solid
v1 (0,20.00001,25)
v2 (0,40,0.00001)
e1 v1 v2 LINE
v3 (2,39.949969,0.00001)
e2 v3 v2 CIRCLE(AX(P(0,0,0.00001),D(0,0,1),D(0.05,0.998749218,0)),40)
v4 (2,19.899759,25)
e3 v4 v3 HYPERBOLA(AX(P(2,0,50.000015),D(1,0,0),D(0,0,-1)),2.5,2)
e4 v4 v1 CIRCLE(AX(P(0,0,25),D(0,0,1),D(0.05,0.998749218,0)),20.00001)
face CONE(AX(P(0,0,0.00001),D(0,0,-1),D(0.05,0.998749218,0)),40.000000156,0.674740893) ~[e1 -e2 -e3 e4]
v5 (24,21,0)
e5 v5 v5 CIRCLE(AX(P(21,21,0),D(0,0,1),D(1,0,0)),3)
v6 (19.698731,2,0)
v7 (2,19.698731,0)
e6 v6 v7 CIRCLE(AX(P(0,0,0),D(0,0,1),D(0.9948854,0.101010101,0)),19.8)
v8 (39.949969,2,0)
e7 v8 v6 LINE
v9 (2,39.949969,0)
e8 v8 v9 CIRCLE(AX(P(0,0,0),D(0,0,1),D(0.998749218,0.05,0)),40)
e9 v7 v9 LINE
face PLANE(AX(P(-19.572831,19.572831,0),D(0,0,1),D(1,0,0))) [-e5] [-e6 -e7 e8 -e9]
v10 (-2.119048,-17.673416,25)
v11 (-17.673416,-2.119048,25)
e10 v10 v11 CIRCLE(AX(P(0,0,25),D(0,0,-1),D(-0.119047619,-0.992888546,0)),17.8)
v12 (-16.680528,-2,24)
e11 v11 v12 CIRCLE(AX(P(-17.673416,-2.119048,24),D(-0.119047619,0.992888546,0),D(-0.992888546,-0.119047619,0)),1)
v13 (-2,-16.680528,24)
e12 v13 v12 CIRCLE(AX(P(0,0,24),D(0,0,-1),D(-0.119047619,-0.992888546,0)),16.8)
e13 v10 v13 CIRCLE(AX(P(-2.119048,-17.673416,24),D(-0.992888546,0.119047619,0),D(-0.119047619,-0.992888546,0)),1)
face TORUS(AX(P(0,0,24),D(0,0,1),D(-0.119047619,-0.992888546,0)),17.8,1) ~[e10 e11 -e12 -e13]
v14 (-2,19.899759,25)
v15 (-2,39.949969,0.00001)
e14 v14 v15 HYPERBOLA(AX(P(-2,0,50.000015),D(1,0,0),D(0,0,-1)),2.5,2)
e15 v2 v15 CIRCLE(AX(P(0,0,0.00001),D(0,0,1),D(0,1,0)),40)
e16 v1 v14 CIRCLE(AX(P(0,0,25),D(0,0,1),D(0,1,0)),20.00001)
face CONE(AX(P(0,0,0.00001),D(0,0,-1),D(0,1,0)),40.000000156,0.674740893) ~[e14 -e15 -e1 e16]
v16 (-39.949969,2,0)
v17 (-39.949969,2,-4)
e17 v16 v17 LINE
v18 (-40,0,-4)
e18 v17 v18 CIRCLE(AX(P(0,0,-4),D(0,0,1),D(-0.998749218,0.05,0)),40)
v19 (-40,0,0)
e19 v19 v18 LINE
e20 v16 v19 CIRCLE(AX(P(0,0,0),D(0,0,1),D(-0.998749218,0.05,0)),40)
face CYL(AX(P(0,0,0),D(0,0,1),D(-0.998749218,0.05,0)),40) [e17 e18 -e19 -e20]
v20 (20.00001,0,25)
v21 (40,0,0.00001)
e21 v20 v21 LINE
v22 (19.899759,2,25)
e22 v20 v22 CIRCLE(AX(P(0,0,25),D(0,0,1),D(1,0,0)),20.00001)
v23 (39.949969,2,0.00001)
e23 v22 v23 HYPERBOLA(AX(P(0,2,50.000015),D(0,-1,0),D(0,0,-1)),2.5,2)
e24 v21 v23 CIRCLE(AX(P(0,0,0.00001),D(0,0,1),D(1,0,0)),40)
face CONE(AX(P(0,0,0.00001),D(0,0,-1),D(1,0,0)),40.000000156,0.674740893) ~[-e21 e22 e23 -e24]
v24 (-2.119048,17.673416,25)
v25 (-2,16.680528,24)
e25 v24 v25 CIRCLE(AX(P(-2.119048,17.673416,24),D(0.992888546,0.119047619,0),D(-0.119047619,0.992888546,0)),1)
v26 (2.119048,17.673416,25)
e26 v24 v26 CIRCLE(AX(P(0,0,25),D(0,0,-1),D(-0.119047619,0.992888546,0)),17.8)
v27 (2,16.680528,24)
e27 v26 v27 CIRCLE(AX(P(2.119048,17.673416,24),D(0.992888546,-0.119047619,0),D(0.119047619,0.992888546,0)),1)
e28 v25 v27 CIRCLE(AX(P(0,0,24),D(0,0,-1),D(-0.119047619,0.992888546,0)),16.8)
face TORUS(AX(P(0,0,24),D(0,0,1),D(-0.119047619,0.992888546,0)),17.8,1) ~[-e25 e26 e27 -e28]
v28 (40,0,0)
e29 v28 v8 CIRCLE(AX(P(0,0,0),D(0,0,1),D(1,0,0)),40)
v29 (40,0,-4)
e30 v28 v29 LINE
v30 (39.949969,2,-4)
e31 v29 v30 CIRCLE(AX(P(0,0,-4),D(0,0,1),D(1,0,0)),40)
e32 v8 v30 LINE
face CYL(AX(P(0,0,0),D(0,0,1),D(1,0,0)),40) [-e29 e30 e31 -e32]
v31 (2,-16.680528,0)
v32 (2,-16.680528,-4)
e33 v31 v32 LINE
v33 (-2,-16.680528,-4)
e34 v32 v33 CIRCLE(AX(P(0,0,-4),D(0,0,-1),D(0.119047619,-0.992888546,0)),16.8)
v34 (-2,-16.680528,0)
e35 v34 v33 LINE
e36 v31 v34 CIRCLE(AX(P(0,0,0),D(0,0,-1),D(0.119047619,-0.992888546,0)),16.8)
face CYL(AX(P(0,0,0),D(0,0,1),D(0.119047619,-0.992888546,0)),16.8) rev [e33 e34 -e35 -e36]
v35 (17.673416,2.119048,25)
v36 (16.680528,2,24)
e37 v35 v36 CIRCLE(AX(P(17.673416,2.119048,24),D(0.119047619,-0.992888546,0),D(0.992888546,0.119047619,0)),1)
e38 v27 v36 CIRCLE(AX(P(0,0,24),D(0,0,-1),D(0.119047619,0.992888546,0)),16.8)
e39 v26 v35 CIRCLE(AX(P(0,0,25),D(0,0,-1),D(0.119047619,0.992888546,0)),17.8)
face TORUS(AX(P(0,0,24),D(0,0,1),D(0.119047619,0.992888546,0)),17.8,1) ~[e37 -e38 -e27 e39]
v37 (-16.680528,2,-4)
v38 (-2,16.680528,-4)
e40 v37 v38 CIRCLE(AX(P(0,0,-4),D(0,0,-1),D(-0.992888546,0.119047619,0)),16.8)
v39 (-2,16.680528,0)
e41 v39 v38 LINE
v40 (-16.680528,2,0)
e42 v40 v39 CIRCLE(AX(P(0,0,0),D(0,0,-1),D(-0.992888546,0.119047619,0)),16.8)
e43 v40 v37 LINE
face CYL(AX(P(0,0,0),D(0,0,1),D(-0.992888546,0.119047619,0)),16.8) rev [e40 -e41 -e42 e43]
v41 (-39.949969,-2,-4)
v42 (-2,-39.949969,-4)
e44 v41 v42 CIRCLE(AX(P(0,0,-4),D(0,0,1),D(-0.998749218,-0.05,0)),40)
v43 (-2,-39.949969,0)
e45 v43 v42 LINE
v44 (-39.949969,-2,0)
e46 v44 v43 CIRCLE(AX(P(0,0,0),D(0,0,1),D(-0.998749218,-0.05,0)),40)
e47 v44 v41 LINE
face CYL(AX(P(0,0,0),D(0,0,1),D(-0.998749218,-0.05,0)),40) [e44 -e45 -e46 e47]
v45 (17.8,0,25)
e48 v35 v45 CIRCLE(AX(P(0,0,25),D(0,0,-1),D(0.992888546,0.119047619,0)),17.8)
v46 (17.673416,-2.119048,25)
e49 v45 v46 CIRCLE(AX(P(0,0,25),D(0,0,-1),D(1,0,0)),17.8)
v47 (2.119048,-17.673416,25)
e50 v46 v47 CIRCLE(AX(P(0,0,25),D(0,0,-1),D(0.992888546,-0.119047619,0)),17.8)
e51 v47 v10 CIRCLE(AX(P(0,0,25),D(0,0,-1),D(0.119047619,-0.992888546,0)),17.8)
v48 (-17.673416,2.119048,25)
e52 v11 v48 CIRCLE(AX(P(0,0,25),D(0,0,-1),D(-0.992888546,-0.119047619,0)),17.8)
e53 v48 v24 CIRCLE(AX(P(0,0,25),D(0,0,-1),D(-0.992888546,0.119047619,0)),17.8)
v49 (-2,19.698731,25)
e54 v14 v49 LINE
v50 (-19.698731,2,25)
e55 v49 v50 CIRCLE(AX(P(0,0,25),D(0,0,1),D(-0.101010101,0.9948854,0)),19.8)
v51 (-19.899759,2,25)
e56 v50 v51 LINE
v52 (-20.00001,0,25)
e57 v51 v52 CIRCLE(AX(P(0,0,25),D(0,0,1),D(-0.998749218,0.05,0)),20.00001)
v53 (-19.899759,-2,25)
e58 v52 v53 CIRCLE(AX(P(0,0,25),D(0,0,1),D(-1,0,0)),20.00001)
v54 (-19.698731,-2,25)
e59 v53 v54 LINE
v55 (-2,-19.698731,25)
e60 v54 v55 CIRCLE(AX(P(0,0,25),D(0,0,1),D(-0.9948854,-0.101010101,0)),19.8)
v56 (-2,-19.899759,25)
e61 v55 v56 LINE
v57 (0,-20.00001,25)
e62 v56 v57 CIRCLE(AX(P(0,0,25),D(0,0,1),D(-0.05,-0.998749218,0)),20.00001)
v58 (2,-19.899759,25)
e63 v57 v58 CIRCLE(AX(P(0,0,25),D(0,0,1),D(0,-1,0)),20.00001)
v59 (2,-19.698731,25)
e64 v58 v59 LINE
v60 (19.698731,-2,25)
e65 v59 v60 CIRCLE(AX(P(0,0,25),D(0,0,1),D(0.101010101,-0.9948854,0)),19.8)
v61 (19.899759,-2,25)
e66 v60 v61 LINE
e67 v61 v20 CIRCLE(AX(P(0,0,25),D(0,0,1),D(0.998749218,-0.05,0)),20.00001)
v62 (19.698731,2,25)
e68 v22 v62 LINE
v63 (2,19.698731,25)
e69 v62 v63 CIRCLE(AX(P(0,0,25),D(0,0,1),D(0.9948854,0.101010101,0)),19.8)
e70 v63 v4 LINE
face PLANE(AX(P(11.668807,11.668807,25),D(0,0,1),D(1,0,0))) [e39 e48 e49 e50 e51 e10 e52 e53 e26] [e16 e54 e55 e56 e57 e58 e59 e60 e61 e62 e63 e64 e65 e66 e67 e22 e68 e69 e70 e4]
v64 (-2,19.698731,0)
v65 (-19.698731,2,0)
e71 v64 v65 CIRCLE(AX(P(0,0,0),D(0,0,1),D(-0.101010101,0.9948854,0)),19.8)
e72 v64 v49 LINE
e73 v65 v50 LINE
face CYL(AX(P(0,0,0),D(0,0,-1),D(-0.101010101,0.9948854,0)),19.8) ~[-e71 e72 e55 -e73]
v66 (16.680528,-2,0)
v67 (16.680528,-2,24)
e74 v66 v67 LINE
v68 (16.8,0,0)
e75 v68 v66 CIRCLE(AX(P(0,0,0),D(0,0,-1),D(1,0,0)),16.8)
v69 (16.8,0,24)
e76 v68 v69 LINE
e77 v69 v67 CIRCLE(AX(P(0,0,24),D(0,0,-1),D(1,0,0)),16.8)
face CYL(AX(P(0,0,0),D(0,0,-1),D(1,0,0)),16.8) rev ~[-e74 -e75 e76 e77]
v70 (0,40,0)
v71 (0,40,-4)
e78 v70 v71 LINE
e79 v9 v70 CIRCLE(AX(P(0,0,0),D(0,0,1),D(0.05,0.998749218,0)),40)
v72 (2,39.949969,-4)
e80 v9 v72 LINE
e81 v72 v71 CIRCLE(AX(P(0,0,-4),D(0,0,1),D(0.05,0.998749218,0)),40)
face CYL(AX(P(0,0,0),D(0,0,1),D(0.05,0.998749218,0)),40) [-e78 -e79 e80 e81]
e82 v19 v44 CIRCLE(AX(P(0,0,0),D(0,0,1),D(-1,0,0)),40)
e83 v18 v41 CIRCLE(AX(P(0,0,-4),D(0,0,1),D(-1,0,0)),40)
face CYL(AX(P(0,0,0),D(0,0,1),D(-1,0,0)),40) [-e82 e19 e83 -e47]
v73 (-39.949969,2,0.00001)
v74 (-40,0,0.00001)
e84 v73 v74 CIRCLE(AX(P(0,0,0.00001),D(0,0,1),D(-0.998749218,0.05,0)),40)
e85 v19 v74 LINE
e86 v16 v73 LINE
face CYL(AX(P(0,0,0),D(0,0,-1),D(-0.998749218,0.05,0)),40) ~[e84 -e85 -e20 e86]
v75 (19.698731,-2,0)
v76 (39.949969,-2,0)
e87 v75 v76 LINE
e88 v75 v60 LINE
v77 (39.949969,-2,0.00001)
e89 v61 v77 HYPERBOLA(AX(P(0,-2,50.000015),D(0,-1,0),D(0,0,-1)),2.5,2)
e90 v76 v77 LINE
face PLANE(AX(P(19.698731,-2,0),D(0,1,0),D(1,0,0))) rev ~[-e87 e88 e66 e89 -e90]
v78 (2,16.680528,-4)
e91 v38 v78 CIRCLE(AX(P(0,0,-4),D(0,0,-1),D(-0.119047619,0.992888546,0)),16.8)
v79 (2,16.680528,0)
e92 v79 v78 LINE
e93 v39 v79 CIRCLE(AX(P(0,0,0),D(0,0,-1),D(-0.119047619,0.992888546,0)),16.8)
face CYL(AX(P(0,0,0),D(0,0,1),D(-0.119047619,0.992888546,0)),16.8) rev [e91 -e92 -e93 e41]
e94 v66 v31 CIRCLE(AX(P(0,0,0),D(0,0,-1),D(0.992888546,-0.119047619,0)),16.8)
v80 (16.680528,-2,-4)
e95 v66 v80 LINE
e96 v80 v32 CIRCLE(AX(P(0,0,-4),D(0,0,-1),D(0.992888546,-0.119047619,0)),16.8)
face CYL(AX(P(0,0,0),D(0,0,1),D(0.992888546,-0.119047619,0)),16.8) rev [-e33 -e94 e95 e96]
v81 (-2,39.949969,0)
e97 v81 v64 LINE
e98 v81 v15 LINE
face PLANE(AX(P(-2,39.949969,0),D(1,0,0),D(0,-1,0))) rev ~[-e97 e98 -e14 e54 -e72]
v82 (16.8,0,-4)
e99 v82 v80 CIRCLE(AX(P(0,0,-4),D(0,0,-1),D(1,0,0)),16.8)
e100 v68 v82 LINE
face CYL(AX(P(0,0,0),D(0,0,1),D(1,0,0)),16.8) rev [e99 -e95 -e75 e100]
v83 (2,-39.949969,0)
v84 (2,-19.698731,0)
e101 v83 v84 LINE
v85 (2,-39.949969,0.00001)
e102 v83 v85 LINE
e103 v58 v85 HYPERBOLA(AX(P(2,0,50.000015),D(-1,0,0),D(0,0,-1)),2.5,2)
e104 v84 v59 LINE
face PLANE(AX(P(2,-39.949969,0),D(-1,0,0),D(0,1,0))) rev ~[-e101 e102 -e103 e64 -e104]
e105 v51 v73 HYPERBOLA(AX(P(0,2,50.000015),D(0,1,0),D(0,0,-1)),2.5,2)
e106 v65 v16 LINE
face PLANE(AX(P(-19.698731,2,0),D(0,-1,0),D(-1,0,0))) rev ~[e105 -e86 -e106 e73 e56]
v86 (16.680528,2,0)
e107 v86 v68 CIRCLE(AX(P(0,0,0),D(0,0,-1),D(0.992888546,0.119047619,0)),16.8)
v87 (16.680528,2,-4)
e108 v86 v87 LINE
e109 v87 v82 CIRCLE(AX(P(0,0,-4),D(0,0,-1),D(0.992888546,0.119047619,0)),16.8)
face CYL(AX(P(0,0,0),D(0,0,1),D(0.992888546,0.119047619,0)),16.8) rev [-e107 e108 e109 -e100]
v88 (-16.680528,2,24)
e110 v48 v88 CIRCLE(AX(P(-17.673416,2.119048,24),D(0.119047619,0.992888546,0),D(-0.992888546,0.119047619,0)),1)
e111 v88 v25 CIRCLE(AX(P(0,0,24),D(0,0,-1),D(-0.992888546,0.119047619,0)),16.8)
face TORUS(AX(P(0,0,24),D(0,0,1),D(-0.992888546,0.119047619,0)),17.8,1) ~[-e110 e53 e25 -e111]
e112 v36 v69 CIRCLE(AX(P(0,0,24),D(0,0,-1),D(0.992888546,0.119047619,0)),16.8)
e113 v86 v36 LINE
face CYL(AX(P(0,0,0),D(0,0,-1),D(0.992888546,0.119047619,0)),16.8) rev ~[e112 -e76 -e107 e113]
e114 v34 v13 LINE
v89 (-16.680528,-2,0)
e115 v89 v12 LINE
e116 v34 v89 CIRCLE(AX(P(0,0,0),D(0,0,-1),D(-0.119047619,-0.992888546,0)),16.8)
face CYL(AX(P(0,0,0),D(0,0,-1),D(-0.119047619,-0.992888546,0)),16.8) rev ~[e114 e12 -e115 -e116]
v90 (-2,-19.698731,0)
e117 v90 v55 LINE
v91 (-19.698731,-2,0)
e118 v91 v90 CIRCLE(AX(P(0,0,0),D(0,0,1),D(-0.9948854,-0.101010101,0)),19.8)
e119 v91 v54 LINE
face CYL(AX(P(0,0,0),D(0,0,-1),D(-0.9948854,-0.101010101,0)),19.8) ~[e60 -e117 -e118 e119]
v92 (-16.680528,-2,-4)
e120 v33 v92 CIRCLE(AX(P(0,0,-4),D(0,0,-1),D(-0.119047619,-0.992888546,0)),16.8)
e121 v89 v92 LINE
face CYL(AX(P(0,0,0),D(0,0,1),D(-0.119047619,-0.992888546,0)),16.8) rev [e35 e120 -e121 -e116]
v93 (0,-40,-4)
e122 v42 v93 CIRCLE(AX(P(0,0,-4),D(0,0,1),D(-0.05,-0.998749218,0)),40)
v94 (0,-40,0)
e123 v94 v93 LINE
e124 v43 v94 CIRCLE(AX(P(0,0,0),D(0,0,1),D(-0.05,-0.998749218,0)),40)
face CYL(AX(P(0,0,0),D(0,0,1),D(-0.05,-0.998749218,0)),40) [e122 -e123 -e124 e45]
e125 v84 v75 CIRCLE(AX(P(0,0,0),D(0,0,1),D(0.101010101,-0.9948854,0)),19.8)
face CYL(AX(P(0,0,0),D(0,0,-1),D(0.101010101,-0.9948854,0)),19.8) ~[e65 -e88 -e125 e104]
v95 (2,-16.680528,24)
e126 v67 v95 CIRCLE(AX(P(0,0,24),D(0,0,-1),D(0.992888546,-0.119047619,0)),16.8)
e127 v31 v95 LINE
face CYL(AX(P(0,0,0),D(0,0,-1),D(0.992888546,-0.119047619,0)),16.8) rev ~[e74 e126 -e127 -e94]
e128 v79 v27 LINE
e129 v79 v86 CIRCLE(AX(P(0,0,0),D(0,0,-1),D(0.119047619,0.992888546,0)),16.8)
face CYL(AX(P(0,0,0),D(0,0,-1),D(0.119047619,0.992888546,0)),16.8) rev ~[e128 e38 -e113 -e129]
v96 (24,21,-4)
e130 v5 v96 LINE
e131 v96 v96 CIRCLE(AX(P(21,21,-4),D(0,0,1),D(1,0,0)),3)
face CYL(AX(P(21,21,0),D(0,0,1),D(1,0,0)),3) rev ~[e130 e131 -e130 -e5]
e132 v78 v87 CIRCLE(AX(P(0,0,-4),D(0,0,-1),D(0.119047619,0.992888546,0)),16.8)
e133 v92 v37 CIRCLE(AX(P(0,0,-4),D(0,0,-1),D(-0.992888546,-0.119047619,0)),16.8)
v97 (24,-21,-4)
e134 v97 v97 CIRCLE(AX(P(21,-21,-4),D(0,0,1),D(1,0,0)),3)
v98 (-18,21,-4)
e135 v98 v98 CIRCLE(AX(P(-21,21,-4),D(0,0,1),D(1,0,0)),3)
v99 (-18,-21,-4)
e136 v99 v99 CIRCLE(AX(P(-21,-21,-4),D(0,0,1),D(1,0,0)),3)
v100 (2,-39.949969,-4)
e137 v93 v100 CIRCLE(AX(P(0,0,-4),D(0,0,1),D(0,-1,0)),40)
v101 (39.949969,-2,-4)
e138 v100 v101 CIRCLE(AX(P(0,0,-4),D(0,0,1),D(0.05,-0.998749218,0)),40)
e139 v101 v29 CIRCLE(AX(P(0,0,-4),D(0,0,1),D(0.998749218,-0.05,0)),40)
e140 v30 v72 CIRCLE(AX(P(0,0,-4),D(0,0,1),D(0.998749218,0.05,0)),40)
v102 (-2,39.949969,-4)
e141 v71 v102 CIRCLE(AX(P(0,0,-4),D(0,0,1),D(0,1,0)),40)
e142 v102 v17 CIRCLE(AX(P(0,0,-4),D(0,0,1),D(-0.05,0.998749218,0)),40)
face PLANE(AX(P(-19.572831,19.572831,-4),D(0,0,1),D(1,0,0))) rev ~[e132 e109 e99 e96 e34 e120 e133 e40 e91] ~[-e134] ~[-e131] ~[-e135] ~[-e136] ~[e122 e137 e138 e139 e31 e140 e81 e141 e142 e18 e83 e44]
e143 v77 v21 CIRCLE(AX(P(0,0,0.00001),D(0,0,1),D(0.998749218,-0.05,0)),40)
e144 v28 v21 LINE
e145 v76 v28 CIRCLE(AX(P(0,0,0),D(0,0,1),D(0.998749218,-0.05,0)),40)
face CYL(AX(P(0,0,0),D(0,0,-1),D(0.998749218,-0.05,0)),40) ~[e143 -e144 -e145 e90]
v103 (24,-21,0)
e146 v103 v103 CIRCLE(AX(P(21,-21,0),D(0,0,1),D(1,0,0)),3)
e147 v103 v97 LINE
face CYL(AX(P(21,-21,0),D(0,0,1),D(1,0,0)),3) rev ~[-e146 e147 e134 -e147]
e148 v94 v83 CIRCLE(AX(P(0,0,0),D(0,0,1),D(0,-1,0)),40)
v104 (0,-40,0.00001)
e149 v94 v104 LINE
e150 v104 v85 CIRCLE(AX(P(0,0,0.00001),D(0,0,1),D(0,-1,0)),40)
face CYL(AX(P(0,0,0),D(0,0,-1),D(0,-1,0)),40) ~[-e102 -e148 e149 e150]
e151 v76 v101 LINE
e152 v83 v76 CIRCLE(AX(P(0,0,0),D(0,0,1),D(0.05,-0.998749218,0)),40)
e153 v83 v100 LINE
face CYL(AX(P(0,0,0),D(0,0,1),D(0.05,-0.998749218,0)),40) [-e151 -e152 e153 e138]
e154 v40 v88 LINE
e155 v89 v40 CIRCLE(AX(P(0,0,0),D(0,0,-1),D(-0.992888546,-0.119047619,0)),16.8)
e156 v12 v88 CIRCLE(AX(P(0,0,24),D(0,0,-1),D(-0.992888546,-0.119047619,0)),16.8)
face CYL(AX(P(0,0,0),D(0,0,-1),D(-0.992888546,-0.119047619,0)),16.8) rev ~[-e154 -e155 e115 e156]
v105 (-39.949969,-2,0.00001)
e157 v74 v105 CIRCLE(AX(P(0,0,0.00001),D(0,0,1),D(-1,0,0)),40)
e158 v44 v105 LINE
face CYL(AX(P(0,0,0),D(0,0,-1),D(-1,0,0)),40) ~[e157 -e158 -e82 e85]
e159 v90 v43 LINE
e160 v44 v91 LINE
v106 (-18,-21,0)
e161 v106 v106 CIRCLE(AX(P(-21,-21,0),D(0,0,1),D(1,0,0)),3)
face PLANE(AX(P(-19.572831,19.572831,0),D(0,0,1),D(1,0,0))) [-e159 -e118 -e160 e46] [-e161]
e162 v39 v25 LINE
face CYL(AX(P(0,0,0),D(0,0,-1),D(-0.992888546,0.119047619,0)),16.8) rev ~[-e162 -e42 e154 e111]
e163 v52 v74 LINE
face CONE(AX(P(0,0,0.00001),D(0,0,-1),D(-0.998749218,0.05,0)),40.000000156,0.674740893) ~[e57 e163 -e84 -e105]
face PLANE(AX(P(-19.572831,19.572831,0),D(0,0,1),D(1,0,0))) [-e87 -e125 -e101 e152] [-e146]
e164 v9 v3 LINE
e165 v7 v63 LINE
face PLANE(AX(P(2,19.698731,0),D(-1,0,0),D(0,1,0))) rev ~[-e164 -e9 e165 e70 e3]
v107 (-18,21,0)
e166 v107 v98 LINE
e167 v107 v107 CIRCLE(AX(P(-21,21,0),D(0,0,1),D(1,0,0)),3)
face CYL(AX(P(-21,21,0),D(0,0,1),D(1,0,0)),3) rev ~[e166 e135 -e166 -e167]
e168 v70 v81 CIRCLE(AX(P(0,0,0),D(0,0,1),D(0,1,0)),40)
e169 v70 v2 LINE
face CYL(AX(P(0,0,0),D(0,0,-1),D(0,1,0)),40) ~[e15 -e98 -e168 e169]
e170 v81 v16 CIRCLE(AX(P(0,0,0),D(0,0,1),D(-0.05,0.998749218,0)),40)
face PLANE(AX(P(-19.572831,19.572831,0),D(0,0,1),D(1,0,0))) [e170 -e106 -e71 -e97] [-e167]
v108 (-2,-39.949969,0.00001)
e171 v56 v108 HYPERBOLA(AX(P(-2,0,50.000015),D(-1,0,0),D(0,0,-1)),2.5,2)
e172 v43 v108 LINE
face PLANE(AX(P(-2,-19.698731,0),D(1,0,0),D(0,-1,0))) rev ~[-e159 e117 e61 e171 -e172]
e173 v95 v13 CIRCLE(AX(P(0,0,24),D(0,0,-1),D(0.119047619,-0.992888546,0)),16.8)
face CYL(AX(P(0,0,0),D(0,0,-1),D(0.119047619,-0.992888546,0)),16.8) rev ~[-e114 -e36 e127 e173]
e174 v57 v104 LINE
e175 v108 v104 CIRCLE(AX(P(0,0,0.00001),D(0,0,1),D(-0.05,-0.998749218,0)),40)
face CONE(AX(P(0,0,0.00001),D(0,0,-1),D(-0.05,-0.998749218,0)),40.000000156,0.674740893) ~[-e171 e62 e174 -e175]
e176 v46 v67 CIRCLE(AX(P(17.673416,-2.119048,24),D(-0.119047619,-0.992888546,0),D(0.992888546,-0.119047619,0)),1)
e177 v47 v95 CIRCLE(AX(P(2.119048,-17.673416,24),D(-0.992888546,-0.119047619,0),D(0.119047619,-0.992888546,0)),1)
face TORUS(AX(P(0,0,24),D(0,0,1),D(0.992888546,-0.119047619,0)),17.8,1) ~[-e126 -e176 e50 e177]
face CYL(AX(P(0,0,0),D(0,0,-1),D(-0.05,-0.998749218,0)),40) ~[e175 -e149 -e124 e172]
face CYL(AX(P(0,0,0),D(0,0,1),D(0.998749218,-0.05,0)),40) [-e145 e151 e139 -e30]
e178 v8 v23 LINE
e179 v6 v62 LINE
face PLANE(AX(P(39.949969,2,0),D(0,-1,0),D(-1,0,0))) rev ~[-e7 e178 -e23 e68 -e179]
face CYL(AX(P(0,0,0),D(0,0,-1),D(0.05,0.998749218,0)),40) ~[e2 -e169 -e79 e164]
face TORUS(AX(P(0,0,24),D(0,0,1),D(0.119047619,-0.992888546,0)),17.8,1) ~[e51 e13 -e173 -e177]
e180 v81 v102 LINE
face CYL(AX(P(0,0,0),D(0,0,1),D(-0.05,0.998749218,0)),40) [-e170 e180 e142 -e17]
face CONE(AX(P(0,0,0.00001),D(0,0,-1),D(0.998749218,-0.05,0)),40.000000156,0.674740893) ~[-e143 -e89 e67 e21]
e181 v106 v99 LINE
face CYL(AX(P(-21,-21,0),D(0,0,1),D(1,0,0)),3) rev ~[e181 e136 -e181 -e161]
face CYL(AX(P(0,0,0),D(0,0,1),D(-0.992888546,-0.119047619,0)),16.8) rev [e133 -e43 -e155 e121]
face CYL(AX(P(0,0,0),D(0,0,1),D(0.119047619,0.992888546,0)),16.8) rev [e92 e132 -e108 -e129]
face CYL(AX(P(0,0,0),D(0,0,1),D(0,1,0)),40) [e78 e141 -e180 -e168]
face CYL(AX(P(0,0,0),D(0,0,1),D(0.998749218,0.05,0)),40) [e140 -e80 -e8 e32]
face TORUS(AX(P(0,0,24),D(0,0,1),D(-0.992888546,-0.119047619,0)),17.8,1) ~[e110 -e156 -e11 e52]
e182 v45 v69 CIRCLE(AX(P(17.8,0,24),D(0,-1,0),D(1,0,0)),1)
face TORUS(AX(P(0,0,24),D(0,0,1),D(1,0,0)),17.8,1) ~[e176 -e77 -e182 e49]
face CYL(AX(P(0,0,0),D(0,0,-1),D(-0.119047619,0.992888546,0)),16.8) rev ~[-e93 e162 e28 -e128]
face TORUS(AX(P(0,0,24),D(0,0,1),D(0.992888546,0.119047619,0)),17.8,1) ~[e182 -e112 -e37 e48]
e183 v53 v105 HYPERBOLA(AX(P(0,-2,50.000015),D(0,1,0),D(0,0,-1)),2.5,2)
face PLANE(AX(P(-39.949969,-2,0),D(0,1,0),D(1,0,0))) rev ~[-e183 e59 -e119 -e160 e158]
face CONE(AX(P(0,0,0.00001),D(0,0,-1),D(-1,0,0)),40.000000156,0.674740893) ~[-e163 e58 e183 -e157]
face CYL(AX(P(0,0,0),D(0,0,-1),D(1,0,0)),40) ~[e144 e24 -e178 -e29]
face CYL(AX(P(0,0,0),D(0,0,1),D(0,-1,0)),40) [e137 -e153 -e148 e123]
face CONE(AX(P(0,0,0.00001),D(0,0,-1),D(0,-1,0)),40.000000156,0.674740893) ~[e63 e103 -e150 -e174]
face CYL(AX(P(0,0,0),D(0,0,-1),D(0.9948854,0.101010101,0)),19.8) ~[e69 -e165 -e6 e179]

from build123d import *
from build123d import SkipClean  # not in build123d's __all__

# Parameters (mm, degrees)
F1_DEPTH = 25
F0_R     = 3
F2_DEPTH = 4
F3_SIZE2 = 24.99999
F3_SIZE  = 19.99999
F4_R     = 1


# Not quite as in the source:
# - a fillet or chamfer is up to 0.001 mm smaller than in the source, because OpenCascade refuses the exact size


with BuildPart() as f1:
    # F0 (on Top) → F1 (new body)
    with BuildSketch(Plane.XY):
        with BuildLine():
            ThreePointArc((2, 16.6805275696), (11.8793939239, 11.8793939239), (16.6805275696, 2))
            Line((16.6805275696, 2), (19.6987309236, 2))
            ThreePointArc((19.6987309236, 2), (14.0007142675, 14.0007142675), (2, 19.6987309236))
            Line((2, 19.6987309236), (2, 16.6805275696))
        make_face()
        with BuildLine():
            ThreePointArc((-2, 16.6805275696), (0, 16.8), (2, 16.6805275696))
            Line((2, 16.6805275696), (2, 19.6987309236))
            ThreePointArc((2, 19.6987309236), (0, 19.8), (-2, 19.6987309236))
            Line((-2, 19.6987309236), (-2, 16.6805275696))
        make_face()
        with BuildLine():
            ThreePointArc((-16.6805275696, 2), (-11.8793939239, 11.8793939239), (-2, 16.6805275696))
            Line((-2, 16.6805275696), (-2, 19.6987309236))
            ThreePointArc((-2, 19.6987309236), (-14.0007142675, 14.0007142675), (-19.6987309236, 2))
            Line((-19.6987309236, 2), (-16.6805275696, 2))
        make_face()
        with BuildLine():
            ThreePointArc((-16.6805275696, -2), (-16.8, 0), (-16.6805275696, 2))
            Line((-16.6805275696, 2), (-19.6987309236, 2))
            ThreePointArc((-19.6987309236, 2), (-19.8, 0), (-19.6987309236, -2))
            Line((-19.6987309236, -2), (-16.6805275696, -2))
        make_face()
        with BuildLine():
            Line((-2, -19.6987309236), (-2, -16.6805275696))
            ThreePointArc((-2, -16.6805275696), (-11.8793939239, -11.8793939239), (-16.6805275696, -2))
            Line((-16.6805275696, -2), (-19.6987309236, -2))
            ThreePointArc((-19.6987309236, -2), (-14.0007142675, -14.0007142675), (-2, -19.6987309236))
        make_face()
        with BuildLine():
            Line((2, -19.6987309236), (2, -16.6805275696))
            ThreePointArc((2, -16.6805275696), (0, -16.8), (-2, -16.6805275696))
            Line((-2, -16.6805275696), (-2, -19.6987309236))
            ThreePointArc((-2, -19.6987309236), (0, -19.8), (2, -19.6987309236))
        make_face()
        with BuildLine():
            Line((19.6987309236, -2), (16.6805275696, -2))
            ThreePointArc((16.6805275696, -2), (11.8793939239, -11.8793939239), (2, -16.6805275696))
            Line((2, -16.6805275696), (2, -19.6987309236))
            ThreePointArc((2, -19.6987309236), (14.0007142675, -14.0007142675), (19.6987309236, -2))
        make_face()
        with BuildLine():
            ThreePointArc((16.6805275696, 2), (16.7701052944, 1.0017826188), (16.8, 0))
            ThreePointArc((16.8, 0), (16.7701052944, -1.0017826188), (16.6805275696, -2))
            Line((16.6805275696, -2), (19.6987309236, -2))
            ThreePointArc((19.6987309236, -2), (19.7746665242, -1.0012811076), (19.8, 0))
            ThreePointArc((19.8, 0), (19.7746665242, 1.0012811076), (19.6987309236, 2))
            Line((19.6987309236, 2), (16.6805275696, 2))
        make_face()
        with BuildLine():
            ThreePointArc((-19.6987309236, -2), (-19.8, 0), (-19.6987309236, 2))
            Line((-19.6987309236, 2), (-39.9499687109, 2))
            ThreePointArc((-39.9499687109, 2), (-39.9874902215, 1.0003128423), (-40, 0))
            ThreePointArc((-40, 0), (-39.9874902215, -1.0003128423), (-39.9499687109, -2))
            Line((-39.9499687109, -2), (-19.6987309236, -2))
        make_face()
        with BuildLine():
            Line((2, -39.9499687109), (2, -19.6987309236))
            ThreePointArc((2, -19.6987309236), (0, -19.8), (-2, -19.6987309236))
            Line((-2, -19.6987309236), (-2, -39.9499687109))
            ThreePointArc((-2, -39.9499687109), (-1.0003128423, -39.9874902215), (0, -40))
            ThreePointArc((0, -40), (1.0003128423, -39.9874902215), (2, -39.9499687109))
        make_face()
        with BuildLine():
            Line((39.9499687109, 2), (19.6987309236, 2))
            ThreePointArc((19.6987309236, 2), (19.7746665242, 1.0012811076), (19.8, 0))
            ThreePointArc((19.8, 0), (19.7746665242, -1.0012811076), (19.6987309236, -2))
            Line((19.6987309236, -2), (39.9499687109, -2))
            ThreePointArc((39.9499687109, -2), (39.9874902215, -1.0003128423), (40, 0))
            ThreePointArc((40, 0), (39.9874902215, 1.0003128423), (39.9499687109, 2))
        make_face()
        with BuildLine():
            ThreePointArc((-2, 19.6987309236), (0, 19.8), (2, 19.6987309236))
            Line((2, 19.6987309236), (2, 39.9499687109))
            ThreePointArc((2, 39.9499687109), (1.0003128423, 39.9874902215), (0, 40))
            ThreePointArc((0, 40), (-1.0003128423, 39.9874902215), (-2, 39.9499687109))
            Line((-2, 39.9499687109), (-2, 19.6987309236))
        make_face()
    extrude(amount=F1_DEPTH)

    # F0 (on Top) → F2 (join)
    with BuildSketch(Plane.XY):
        with BuildLine():
            ThreePointArc((-19.6987309236, 2), (-14.0007142675, 14.0007142675), (-2, 19.6987309236))
            Line((-2, 19.6987309236), (-2, 39.9499687109))
            ThreePointArc((-2, 39.9499687109), (-28.2842712475, 28.2842712475), (-39.9499687109, 2))
            Line((-39.9499687109, 2), (-19.6987309236, 2))
        make_face()
        with Locations((-21, 21)):
            Circle(F0_R, mode=Mode.SUBTRACT)
        with BuildLine():
            ThreePointArc((2, 19.6987309236), (14.0007142675, 14.0007142675), (19.6987309236, 2))
            Line((19.6987309236, 2), (39.9499687109, 2))
            ThreePointArc((39.9499687109, 2), (28.2842712475, 28.2842712475), (2, 39.9499687109))
            Line((2, 39.9499687109), (2, 19.6987309236))
        make_face()
        with Locations((21, 21)):
            Circle(F0_R, mode=Mode.SUBTRACT)
        with BuildLine():
            Line((39.9499687109, 2), (19.6987309236, 2))
            ThreePointArc((19.6987309236, 2), (19.7746665242, 1.0012811076), (19.8, 0))
            ThreePointArc((19.8, 0), (19.7746665242, -1.0012811076), (19.6987309236, -2))
            Line((19.6987309236, -2), (39.9499687109, -2))
            ThreePointArc((39.9499687109, -2), (39.9874902215, -1.0003128423), (40, 0))
            ThreePointArc((40, 0), (39.9874902215, 1.0003128423), (39.9499687109, 2))
        make_face()
        with BuildLine():
            ThreePointArc((-2, 19.6987309236), (0, 19.8), (2, 19.6987309236))
            Line((2, 19.6987309236), (2, 39.9499687109))
            ThreePointArc((2, 39.9499687109), (1.0003128423, 39.9874902215), (0, 40))
            ThreePointArc((0, 40), (-1.0003128423, 39.9874902215), (-2, 39.9499687109))
            Line((-2, 39.9499687109), (-2, 19.6987309236))
        make_face()
        with BuildLine():
            Line((39.9499687109, -2), (19.6987309236, -2))
            ThreePointArc((19.6987309236, -2), (14.0007142675, -14.0007142675), (2, -19.6987309236))
            Line((2, -19.6987309236), (2, -39.9499687109))
            ThreePointArc((2, -39.9499687109), (28.2842712475, -28.2842712475), (39.9499687109, -2))
        make_face()
        with Locations((21, -21)):
            Circle(F0_R, mode=Mode.SUBTRACT)
        with BuildLine():
            Line((19.6987309236, -2), (16.6805275696, -2))
            ThreePointArc((16.6805275696, -2), (11.8793939239, -11.8793939239), (2, -16.6805275696))
            Line((2, -16.6805275696), (2, -19.6987309236))
            ThreePointArc((2, -19.6987309236), (14.0007142675, -14.0007142675), (19.6987309236, -2))
        make_face()
        with BuildLine():
            ThreePointArc((16.6805275696, 2), (16.7701052944, 1.0017826188), (16.8, 0))
            ThreePointArc((16.8, 0), (16.7701052944, -1.0017826188), (16.6805275696, -2))
            Line((16.6805275696, -2), (19.6987309236, -2))
            ThreePointArc((19.6987309236, -2), (19.7746665242, -1.0012811076), (19.8, 0))
            ThreePointArc((19.8, 0), (19.7746665242, 1.0012811076), (19.6987309236, 2))
            Line((19.6987309236, 2), (16.6805275696, 2))
        make_face()
        with BuildLine():
            ThreePointArc((2, 16.6805275696), (11.8793939239, 11.8793939239), (16.6805275696, 2))
            Line((16.6805275696, 2), (19.6987309236, 2))
            ThreePointArc((19.6987309236, 2), (14.0007142675, 14.0007142675), (2, 19.6987309236))
            Line((2, 19.6987309236), (2, 16.6805275696))
        make_face()
        with BuildLine():
            Line((2, -19.6987309236), (2, -16.6805275696))
            ThreePointArc((2, -16.6805275696), (0, -16.8), (-2, -16.6805275696))
            Line((-2, -16.6805275696), (-2, -19.6987309236))
            ThreePointArc((-2, -19.6987309236), (0, -19.8), (2, -19.6987309236))
        make_face()
        with BuildLine():
            Line((2, -39.9499687109), (2, -19.6987309236))
            ThreePointArc((2, -19.6987309236), (0, -19.8), (-2, -19.6987309236))
            Line((-2, -19.6987309236), (-2, -39.9499687109))
            ThreePointArc((-2, -39.9499687109), (-1.0003128423, -39.9874902215), (0, -40))
            ThreePointArc((0, -40), (1.0003128423, -39.9874902215), (2, -39.9499687109))
        make_face()
        with BuildLine():
            Line((-2, -19.6987309236), (-2, -16.6805275696))
            ThreePointArc((-2, -16.6805275696), (-11.8793939239, -11.8793939239), (-16.6805275696, -2))
            Line((-16.6805275696, -2), (-19.6987309236, -2))
            ThreePointArc((-19.6987309236, -2), (-14.0007142675, -14.0007142675), (-2, -19.6987309236))
        make_face()
        with BuildLine():
            Line((-2, -39.9499687109), (-2, -19.6987309236))
            ThreePointArc((-2, -19.6987309236), (-14.0007142675, -14.0007142675), (-19.6987309236, -2))
            Line((-19.6987309236, -2), (-39.9499687109, -2))
            ThreePointArc((-39.9499687109, -2), (-28.2842712475, -28.2842712475), (-2, -39.9499687109))
        make_face()
        with Locations((-21, -21)):
            Circle(F0_R, mode=Mode.SUBTRACT)
        with BuildLine():
            ThreePointArc((-19.6987309236, -2), (-19.8, 0), (-19.6987309236, 2))
            Line((-19.6987309236, 2), (-39.9499687109, 2))
            ThreePointArc((-39.9499687109, 2), (-39.9874902215, 1.0003128423), (-40, 0))
            ThreePointArc((-40, 0), (-39.9874902215, -1.0003128423), (-39.9499687109, -2))
            Line((-39.9499687109, -2), (-19.6987309236, -2))
        make_face()
        with BuildLine():
            ThreePointArc((-16.6805275696, -2), (-16.8, 0), (-16.6805275696, 2))
            Line((-16.6805275696, 2), (-19.6987309236, 2))
            ThreePointArc((-19.6987309236, 2), (-19.8, 0), (-19.6987309236, -2))
            Line((-19.6987309236, -2), (-16.6805275696, -2))
        make_face()
        with BuildLine():
            ThreePointArc((-16.6805275696, 2), (-11.8793939239, 11.8793939239), (-2, 16.6805275696))
            Line((-2, 16.6805275696), (-2, 19.6987309236))
            ThreePointArc((-2, 19.6987309236), (-14.0007142675, 14.0007142675), (-19.6987309236, 2))
            Line((-19.6987309236, 2), (-16.6805275696, 2))
        make_face()
        with BuildLine():
            ThreePointArc((-2, 16.6805275696), (0, 16.8), (2, 16.6805275696))
            Line((2, 16.6805275696), (2, 19.6987309236))
            ThreePointArc((2, 19.6987309236), (0, 19.8), (-2, 19.6987309236))
            Line((-2, 19.6987309236), (-2, 16.6805275696))
        make_face()
    with SkipClean():  # cleaning this boolean's faces spoils the solid; the shape is the same uncleaned
        extrude(amount=-F2_DEPTH)

    # F3 (size 20 and 25 in the source; OpenCascade refuses exactly that, so slightly less here)
    f3_edges = [f1.edges().sort_by_distance(p)[0] for p in [
        (-40, 0, 25),
        (0, -40, 25),
        (40, 0, 25),
        (0, 40, 25),
    ]]
    f3_side = f1.faces().sort_by_distance((-29.82435, 0.868629, 25))[0]
    chamfer(f3_edges, length=F3_SIZE, length2=F3_SIZE2, reference=f3_side)

    # F4
    f4_edges = [f1.edges().sort_by_distance(p)[0] for p in [
        (-16.680528, -2, 25),
    ]]
    fillet(f4_edges, radius=F4_R)


solid = f1.part
